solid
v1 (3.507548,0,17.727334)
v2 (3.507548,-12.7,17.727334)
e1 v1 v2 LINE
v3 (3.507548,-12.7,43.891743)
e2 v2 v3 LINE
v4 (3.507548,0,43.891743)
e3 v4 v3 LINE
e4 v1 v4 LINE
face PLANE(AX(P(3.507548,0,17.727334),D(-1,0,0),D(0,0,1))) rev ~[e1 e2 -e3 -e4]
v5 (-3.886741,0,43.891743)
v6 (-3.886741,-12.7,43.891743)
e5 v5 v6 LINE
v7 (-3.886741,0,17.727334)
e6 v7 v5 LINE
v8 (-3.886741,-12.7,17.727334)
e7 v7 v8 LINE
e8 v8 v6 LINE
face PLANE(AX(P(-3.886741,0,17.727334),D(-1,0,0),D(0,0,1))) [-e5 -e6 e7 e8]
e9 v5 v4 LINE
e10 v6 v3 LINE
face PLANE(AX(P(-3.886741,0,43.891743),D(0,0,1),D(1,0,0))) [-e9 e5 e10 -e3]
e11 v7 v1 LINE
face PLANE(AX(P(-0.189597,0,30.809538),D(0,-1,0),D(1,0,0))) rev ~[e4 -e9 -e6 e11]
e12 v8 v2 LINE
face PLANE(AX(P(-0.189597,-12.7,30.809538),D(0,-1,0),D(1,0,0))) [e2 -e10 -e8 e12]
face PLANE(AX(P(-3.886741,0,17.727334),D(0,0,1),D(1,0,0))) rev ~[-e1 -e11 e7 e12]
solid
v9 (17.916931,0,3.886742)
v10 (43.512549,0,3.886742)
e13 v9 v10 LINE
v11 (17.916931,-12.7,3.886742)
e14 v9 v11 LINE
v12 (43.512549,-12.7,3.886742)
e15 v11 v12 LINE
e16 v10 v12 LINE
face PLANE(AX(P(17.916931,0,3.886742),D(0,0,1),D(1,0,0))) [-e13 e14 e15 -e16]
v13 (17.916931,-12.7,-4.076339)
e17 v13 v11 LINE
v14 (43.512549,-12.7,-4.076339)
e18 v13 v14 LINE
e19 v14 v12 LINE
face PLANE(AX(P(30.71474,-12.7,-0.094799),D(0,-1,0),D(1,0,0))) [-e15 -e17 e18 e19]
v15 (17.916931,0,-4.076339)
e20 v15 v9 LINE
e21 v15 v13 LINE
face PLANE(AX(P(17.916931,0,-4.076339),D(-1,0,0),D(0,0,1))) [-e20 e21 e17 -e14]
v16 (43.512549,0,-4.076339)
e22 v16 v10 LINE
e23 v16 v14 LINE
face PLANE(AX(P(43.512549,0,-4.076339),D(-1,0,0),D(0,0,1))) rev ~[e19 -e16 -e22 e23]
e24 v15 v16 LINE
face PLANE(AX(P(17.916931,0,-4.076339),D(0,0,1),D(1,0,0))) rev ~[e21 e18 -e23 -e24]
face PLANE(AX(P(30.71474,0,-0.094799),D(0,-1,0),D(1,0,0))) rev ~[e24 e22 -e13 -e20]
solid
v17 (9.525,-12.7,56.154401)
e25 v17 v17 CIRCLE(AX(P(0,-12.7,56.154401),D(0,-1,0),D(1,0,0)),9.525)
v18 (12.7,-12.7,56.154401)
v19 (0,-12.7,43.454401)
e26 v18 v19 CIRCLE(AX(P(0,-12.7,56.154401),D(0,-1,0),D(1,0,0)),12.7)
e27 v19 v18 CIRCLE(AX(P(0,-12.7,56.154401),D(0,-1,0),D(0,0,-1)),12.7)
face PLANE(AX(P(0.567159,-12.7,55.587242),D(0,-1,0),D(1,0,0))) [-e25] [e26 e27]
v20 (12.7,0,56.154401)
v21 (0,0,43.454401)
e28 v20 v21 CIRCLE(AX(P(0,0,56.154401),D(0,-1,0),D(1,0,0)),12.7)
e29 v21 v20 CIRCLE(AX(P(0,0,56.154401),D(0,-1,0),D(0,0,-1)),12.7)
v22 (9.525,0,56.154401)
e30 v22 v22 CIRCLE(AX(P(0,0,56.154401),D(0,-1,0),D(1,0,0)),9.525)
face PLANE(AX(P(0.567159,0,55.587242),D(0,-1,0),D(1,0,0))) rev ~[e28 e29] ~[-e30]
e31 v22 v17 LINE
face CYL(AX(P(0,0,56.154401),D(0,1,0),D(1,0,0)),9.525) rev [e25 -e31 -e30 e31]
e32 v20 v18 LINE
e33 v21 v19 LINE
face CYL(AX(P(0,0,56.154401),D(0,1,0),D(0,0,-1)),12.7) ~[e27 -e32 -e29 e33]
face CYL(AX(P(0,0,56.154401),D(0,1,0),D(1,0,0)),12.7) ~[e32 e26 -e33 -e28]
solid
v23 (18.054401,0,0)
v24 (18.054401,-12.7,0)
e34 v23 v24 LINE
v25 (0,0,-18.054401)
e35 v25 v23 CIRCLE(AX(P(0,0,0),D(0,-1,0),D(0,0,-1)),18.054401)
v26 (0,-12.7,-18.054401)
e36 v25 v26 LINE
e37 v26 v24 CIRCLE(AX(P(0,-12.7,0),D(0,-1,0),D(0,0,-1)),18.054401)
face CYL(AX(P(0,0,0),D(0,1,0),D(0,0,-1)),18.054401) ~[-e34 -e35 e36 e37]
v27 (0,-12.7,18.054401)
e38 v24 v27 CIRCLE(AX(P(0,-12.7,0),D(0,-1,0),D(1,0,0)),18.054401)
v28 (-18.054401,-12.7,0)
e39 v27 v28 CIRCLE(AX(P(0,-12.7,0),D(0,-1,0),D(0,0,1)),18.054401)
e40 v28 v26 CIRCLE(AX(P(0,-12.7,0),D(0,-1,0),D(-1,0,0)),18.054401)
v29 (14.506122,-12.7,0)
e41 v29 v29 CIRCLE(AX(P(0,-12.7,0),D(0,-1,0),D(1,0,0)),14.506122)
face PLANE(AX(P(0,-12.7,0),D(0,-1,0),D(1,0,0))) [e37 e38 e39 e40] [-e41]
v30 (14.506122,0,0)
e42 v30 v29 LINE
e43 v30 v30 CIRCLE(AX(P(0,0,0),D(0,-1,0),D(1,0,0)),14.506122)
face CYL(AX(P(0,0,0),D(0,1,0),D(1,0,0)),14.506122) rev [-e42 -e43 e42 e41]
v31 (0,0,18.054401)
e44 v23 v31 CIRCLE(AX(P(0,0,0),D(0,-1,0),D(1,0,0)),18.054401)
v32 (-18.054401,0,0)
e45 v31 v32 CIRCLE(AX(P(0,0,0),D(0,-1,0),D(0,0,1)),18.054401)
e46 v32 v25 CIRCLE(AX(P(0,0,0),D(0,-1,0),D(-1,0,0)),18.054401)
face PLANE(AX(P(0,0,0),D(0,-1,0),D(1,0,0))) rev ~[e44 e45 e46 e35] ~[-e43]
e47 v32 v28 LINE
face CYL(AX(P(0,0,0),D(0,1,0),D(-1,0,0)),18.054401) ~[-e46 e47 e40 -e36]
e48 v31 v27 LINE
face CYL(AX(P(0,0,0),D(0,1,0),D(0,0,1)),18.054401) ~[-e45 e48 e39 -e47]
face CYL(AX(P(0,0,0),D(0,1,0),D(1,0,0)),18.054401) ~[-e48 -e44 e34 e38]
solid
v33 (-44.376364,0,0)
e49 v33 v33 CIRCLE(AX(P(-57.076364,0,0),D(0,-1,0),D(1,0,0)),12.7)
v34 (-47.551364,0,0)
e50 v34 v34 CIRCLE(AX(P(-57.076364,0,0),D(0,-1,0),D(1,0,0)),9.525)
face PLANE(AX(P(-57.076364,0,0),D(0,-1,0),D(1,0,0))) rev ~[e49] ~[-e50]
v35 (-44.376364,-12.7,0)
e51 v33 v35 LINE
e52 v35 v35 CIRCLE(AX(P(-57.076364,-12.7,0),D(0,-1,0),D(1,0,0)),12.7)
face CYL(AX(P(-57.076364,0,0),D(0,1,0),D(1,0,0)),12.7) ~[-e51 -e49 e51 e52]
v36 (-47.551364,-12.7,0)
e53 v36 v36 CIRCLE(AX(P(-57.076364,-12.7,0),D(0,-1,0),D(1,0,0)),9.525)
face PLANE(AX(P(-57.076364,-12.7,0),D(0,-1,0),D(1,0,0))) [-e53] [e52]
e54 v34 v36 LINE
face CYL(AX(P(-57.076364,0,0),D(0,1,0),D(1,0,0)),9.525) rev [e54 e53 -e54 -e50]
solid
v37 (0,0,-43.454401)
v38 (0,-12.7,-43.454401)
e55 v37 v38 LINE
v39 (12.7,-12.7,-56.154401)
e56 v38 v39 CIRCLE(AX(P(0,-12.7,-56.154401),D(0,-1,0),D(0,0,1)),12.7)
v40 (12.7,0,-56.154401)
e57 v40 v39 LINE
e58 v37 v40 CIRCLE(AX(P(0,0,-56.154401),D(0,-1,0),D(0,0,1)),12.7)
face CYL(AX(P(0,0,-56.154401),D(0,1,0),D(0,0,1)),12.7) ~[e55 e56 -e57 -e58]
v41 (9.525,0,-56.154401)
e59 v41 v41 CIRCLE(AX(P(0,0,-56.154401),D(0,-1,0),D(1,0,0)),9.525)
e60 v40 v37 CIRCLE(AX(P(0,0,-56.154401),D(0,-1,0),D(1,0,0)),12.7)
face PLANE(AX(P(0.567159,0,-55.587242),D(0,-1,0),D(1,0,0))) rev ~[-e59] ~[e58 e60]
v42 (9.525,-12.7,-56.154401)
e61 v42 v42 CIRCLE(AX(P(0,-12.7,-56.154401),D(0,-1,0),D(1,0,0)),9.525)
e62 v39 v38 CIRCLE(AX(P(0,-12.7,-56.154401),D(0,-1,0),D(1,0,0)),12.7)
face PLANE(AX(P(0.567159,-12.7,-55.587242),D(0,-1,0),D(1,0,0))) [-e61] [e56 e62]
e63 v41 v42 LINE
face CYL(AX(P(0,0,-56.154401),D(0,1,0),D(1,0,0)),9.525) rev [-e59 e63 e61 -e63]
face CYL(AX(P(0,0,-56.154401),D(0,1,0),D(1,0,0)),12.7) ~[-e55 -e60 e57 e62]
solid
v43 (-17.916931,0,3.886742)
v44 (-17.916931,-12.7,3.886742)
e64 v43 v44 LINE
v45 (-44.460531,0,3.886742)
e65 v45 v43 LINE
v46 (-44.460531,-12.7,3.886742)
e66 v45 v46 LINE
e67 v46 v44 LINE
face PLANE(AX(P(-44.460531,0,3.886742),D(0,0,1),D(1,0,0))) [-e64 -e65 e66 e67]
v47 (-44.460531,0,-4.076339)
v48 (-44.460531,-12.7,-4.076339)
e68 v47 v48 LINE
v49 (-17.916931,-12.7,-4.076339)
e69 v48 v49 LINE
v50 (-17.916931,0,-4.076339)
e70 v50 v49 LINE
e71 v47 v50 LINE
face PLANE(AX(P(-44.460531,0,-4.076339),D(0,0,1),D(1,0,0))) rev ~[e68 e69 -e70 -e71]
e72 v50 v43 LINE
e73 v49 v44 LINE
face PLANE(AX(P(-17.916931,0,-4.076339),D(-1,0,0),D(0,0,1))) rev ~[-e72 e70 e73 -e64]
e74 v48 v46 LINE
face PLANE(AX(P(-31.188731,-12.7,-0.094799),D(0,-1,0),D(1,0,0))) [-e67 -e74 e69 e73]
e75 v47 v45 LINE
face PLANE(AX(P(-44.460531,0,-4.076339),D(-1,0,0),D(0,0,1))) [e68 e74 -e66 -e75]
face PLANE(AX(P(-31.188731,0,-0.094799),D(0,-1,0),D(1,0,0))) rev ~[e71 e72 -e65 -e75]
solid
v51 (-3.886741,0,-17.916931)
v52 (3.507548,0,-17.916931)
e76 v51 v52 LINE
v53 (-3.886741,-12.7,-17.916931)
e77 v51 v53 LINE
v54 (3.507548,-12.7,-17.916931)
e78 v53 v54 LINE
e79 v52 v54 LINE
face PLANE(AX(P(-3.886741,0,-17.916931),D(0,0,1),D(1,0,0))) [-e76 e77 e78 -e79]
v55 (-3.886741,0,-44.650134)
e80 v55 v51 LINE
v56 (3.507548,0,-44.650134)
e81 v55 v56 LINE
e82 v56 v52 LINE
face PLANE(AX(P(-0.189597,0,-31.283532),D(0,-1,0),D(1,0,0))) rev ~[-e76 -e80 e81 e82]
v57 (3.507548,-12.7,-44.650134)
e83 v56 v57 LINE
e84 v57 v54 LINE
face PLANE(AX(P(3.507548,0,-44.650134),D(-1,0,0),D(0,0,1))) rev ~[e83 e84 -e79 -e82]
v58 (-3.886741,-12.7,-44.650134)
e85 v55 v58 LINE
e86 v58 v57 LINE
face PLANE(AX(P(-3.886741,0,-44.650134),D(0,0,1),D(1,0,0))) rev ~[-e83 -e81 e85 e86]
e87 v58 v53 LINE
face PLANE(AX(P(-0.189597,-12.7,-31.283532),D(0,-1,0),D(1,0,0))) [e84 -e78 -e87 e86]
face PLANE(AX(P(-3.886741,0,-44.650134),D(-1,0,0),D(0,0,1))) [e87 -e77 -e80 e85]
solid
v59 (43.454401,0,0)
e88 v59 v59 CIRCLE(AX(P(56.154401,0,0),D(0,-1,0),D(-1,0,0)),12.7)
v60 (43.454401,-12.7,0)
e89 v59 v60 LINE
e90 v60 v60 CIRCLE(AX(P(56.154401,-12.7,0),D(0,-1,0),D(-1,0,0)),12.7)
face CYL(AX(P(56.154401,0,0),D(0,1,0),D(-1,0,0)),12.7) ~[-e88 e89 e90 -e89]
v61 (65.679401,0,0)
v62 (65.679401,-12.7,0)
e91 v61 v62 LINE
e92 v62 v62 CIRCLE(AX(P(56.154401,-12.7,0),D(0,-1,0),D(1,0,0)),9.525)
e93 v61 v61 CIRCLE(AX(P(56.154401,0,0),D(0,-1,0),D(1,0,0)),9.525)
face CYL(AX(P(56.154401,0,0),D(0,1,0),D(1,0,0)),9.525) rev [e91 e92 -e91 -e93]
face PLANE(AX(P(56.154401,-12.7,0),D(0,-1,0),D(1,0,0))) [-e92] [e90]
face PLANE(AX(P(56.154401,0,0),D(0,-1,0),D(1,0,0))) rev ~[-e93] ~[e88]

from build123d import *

# Parameters (mm, degrees)
F0_R     = 14.5061220646
F1_DEPTH = 12.7
F0_R_2   = 9.525
F0_R_3   = 12.7
F2_W     = 7.3942888994
F2_H     = 26.1644087732
F3_DEPTH = 12.7
F2_W_2   = 26.5436004847
F2_H_2   = 7.9630806576
F2_H_3   = 26.7332028598
F2_W_3   = 25.5956184119


# Not quite as in the source:
# - a feature of the source that left no trace in its solid (it failed there, or was rolled back) is left out


with BuildPart() as f1:
    # F0 (on Front) → F1 (new body)
    with BuildSketch(Plane.XZ):
        with BuildLine():
            ThreePointArc((0, -18.0544013501), (12.7663896249, -12.7663896249), (18.0544013501, 0))
            ThreePointArc((18.0544013501, 0), (12.7663896249, 12.7663896249), (0, 18.0544013501))
            ThreePointArc((0, 18.0544013501), (-12.7663896249, 12.7663896249), (-18.0544013501, 0))
            ThreePointArc((-18.0544013501, 0), (-12.7663896249, -12.7663896249), (0, -18.0544013501))
        make_face()
        Circle(F0_R, mode=Mode.SUBTRACT)
    extrude(amount=F1_DEPTH)


with BuildPart() as f1b:
    # F0 (on Front) → F1, piece 2 (new body)
    with BuildSketch(Plane.XZ):
        with BuildLine():
            ThreePointArc((12.7, -56.1544013501), (8.9802561211, -47.1741452291), (0, -43.4544013501))
            ThreePointArc((0, -43.4544013501), (-8.9802561211, -65.1346574712), (12.7, -56.1544013501))
        make_face()
        with Locations((0, -56.1544013501)):
            Circle(F0_R_2, mode=Mode.SUBTRACT)
    extrude(amount=F1_DEPTH)


with BuildPart() as f1c:
    # F0 (on Front) → F1, piece 3 (new body)
    with BuildSketch(Plane.XZ):
        with BuildLine():
            ThreePointArc((12.7, 56.1544013501), (-8.9802561211, 65.1346574712), (0, 43.4544013501))
            ThreePointArc((0, 43.4544013501), (8.9802561211, 47.1741452291), (12.7, 56.1544013501))
        make_face()
        with Locations((0, 56.1544013501)):
            Circle(F0_R_2, mode=Mode.SUBTRACT)
    extrude(amount=F1_DEPTH)


with BuildPart() as f1d:
    # F0 (on Front) → F1, piece 4 (new body)
    with BuildSketch(Plane.XZ):
        with BuildLine():
            ThreePointArc((68.8544013501, 0), (56.1544013501, 12.7), (43.4544013501, 0))
            ThreePointArc((43.4544013501, 0), (56.1544013501, -12.7), (68.8544013501, 0))
        make_face()
        with Locations((56.1544013501, 0)):
            Circle(F0_R_2, mode=Mode.SUBTRACT)
    extrude(amount=F1_DEPTH)


with BuildPart() as f1e:
    # F0 (on Front) → F1, piece 5 (new body)
    with BuildSketch(Plane.XZ):
        with Locations((-57.0763641485, 0)):
            Circle(F0_R_3)
        with Locations((-57.0763641485, 0)):
            Circle(F0_R_2, mode=Mode.SUBTRACT)
    extrude(amount=F1_DEPTH)


with BuildPart() as f3:
    # F2 (on Front) → F3 (new body)
    with BuildSketch(Plane.XZ):
        with Locations((-0.1895966707, 30.8095384389)):
            Rectangle(F2_W, F2_H)
    extrude(amount=F3_DEPTH)


with BuildPart() as f3b:
    # F2 (on Front) → F3, piece 2 (new body)
    with BuildSketch(Plane.XZ):
        with Locations((-31.1887310818, -0.09479851)):
            Rectangle(F2_W_2, F2_H_2)
    extrude(amount=F3_DEPTH)


with BuildPart() as f3c:
    # F2 (on Front) → F3, piece 3 (new body)
    with BuildSketch(Plane.XZ):
        with Locations((-0.1895966707, -31.2835322693)):
            Rectangle(F2_W, F2_H_3)
    extrude(amount=F3_DEPTH)


with BuildPart() as f3d:
    # F2 (on Front) → F3, piece 4 (new body)
    with BuildSketch(Plane.XZ):
        with Locations((30.7147400454, -0.09479851)):
            Rectangle(F2_W_3, F2_H_2)
    extrude(amount=F3_DEPTH)


solid = Compound([f1.part, f1b.part, f1c.part, f1d.part, f1e.part, f3.part, f3b.part, f3c.part, f3d.part])
